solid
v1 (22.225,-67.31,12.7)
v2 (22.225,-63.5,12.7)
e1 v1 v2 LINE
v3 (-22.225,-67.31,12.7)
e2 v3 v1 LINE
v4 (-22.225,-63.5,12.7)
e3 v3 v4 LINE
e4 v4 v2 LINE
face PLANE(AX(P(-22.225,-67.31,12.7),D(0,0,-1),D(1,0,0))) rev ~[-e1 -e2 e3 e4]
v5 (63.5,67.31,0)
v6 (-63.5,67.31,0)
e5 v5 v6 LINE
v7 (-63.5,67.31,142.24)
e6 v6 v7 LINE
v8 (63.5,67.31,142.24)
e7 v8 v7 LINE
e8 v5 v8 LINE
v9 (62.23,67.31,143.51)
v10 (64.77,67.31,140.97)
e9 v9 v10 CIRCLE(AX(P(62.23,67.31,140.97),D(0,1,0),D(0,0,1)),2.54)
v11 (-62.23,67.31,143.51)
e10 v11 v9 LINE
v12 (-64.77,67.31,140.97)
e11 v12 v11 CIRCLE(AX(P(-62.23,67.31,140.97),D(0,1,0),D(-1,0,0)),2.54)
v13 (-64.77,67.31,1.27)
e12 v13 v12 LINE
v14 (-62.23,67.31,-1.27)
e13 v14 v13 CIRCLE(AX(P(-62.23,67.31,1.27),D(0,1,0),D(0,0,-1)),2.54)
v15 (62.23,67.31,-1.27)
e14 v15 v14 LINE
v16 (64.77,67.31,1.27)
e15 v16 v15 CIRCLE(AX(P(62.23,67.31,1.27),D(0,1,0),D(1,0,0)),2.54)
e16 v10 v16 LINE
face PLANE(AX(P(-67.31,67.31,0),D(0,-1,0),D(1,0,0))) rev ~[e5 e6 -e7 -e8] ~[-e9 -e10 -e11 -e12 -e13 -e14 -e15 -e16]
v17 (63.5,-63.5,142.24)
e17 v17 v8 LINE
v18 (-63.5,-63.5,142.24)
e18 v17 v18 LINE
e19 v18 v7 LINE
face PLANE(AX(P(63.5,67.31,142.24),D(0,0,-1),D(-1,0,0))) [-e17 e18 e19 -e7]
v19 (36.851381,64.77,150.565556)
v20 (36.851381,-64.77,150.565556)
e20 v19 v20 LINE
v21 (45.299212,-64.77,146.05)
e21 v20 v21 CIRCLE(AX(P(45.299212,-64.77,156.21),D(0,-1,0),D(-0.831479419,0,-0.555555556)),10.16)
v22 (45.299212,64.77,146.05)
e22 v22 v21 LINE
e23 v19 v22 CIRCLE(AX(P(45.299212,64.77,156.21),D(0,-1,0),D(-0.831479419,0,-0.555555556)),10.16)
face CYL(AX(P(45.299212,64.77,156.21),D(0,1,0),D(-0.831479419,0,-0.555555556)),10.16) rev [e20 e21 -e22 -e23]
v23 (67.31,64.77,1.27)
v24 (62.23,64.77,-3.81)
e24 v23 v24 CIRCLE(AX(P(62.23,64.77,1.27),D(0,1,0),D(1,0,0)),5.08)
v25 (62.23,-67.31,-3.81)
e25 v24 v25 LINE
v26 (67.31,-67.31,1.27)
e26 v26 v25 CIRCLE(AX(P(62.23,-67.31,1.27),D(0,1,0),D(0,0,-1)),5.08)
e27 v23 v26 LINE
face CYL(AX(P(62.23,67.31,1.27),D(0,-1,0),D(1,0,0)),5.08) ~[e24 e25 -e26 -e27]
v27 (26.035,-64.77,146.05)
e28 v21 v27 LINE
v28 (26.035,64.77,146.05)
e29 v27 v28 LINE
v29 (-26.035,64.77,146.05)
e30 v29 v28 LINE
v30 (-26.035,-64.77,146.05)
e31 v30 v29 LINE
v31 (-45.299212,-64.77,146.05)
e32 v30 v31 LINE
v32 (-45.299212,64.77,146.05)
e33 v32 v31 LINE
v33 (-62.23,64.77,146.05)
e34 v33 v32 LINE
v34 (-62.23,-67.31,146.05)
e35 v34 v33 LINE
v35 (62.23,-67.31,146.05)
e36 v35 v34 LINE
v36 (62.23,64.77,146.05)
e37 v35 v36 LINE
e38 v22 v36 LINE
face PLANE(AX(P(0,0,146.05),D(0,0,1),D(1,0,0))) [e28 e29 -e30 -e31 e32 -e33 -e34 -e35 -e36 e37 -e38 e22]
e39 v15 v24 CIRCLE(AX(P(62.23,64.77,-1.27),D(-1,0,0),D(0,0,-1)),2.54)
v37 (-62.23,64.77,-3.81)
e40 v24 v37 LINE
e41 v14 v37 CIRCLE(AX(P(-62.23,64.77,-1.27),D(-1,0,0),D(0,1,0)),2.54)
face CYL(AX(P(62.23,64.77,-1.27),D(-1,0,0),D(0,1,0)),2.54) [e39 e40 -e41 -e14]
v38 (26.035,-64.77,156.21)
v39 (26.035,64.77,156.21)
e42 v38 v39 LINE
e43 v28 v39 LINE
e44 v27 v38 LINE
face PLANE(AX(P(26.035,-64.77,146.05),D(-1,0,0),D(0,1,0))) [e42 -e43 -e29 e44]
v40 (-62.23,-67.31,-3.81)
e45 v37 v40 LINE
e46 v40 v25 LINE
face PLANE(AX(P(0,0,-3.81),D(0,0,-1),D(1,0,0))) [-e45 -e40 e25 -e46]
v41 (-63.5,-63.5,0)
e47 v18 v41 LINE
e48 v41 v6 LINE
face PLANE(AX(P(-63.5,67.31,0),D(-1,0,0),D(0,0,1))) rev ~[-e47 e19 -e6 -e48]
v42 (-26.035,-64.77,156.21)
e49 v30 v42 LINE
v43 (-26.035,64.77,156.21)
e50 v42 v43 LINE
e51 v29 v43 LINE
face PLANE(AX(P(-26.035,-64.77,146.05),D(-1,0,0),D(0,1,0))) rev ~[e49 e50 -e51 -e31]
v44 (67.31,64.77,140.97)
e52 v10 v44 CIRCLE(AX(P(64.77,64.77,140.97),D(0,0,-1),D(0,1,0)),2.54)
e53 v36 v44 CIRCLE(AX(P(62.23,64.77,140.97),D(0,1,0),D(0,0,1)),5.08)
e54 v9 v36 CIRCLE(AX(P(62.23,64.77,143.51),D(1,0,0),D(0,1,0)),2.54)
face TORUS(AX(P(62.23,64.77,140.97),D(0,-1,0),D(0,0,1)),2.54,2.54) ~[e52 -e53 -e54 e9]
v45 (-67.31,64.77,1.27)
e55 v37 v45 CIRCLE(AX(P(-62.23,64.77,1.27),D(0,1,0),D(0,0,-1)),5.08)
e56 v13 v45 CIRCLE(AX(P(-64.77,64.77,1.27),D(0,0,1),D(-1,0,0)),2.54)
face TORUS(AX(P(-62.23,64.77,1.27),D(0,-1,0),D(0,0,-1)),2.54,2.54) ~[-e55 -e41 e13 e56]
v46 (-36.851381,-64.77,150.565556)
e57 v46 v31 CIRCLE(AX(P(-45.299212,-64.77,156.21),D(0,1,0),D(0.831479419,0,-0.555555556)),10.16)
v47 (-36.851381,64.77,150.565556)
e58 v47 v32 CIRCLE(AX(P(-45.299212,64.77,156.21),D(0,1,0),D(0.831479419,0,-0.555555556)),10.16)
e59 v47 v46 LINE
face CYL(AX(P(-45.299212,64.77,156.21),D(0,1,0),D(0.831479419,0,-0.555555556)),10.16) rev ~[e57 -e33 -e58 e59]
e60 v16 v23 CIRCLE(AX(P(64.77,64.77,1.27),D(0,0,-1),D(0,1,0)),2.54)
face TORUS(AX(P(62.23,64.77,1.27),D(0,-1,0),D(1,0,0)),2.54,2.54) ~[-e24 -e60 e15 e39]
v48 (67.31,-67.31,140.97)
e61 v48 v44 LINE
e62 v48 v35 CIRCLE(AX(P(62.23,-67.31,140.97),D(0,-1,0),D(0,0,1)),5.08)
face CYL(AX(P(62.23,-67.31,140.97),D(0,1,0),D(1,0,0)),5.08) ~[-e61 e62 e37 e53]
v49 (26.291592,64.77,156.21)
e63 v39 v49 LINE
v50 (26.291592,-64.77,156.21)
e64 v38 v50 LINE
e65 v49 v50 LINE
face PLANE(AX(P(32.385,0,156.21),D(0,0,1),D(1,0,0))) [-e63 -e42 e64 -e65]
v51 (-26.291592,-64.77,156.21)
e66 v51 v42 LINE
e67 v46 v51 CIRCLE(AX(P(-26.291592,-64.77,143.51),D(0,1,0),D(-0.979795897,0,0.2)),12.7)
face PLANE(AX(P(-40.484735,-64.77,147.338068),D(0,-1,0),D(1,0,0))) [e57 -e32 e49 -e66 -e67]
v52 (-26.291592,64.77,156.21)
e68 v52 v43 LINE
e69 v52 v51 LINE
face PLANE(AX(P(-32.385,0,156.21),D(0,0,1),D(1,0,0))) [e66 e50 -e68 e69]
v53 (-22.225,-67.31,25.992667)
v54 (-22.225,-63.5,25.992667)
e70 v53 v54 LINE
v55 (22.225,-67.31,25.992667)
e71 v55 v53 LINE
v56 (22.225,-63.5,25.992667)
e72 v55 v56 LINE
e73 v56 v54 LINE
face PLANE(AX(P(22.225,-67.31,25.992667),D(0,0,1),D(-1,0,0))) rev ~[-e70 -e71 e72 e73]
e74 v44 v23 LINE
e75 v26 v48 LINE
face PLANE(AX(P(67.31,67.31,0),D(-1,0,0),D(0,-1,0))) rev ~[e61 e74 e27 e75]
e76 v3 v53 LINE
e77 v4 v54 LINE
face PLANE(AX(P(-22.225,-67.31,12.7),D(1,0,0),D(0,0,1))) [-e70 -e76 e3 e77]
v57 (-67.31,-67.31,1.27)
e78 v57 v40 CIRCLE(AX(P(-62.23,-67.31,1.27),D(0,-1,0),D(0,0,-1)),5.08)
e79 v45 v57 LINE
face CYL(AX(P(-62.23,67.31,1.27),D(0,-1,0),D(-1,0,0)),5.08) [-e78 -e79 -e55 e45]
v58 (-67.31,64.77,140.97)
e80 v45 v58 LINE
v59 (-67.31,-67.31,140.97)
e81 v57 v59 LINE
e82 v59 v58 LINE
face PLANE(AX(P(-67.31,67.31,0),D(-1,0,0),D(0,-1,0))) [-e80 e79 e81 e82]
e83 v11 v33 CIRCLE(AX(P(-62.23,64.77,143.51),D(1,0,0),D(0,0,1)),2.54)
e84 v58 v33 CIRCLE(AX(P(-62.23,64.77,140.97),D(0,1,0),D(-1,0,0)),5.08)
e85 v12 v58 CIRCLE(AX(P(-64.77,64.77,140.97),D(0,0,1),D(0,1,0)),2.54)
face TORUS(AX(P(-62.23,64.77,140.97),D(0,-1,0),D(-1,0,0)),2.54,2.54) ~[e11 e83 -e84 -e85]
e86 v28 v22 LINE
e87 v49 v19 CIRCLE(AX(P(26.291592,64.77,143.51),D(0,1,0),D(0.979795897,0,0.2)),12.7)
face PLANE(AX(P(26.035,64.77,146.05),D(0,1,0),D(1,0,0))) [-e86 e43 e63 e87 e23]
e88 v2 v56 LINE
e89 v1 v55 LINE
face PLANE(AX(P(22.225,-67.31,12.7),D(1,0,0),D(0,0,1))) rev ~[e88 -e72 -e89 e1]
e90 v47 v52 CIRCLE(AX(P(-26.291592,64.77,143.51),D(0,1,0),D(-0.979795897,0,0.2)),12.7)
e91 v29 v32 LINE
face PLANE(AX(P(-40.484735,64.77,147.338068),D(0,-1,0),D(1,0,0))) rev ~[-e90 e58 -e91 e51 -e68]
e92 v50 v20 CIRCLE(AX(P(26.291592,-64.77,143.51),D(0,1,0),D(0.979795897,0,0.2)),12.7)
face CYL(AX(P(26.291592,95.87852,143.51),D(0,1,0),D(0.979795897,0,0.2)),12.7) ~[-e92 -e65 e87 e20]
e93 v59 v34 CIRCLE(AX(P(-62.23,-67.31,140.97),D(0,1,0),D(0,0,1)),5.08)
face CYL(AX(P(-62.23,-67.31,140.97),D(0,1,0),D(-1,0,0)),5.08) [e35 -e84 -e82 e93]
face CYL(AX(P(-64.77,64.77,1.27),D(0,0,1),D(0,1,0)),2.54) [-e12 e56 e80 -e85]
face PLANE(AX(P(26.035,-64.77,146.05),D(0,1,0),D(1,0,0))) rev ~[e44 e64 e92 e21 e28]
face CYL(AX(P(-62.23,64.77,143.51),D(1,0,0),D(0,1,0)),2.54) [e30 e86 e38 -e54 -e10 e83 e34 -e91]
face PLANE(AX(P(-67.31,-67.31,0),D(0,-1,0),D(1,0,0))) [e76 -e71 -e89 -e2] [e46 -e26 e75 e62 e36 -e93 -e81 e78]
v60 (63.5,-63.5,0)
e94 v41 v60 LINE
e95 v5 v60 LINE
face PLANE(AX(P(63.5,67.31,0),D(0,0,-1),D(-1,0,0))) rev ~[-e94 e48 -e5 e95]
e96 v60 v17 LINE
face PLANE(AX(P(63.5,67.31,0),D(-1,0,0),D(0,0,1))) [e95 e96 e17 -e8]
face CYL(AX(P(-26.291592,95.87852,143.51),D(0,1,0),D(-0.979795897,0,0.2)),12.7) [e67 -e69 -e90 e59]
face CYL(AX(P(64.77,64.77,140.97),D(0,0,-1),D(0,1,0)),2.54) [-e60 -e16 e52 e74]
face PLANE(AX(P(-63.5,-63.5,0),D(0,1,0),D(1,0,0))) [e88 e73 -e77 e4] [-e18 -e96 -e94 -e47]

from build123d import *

# Parameters (mm, degrees)
F0_W         = 134.62
F0_H         = 134.62
F0_W_2       = 127
F0_H_2       = 127
F1_DEPTH     = 140.97
F2_W         = 134.62
F2_H         = 134.62
F3_DEPTH     = 5.08
F4_W         = 22.225
F4_H         = 13.2926666667
F5_DEPTH     = 3.81
F6_W         = 134.62
F6_H         = 134.62
F7_DEPTH     = 3.81
F8_W         = 127
F8_H         = 142.24
F9_DEPTH     = 3.81
F10_W        = 127
F10_H        = 1.27
F11_DEPTH    = 127
F12_R        = 5.08
F13_R        = 2.54
F14_W        = 12.7
F14_H        = 129.54
F15_DEPTH    = 10.16
F16_T1_DEPTH = 191.7570394667
F17_T1_DEPTH = 129.54


# Not quite as in the source:
# - a fillet or chamfer that OpenCascade refuses, or shapes differently, is made with other operations: its cross-section is extruded or revolved along the edge and cut away or added


with BuildPart() as f1:
    # F0 (on Top) → F1 (new body)
    with BuildSketch(Plane.XY):
        Rectangle(F0_W, F0_H)
        Rectangle(F0_W_2, F0_H_2, mode=Mode.SUBTRACT)
    extrude(amount=F1_DEPTH)

    # F2 (on face) → F3 (join)
    with BuildSketch(Plane.XY.offset(140.97)):
        Rectangle(F2_W, F2_H)
    extrude(amount=F3_DEPTH)

    # F4 (on face) → F5 (cut, through all)
    with BuildSketch(Plane.XZ.offset(67.31)):
        with Locations((11.1125, 19.3463333333)):
            Rectangle(F4_W, F4_H)
        with Locations((-11.1125, 19.3463333333)):
            Rectangle(F4_W, F4_H)
    extrude(amount=-F5_DEPTH, mode=Mode.SUBTRACT)

    # F6 (on face) → F7 (join)
    with BuildSketch(Plane(origin=(0, 0, 0), x_dir=(1, 0, 0), z_dir=(0, 0, -1))):
        Rectangle(F6_W, F6_H)
    extrude(amount=F7_DEPTH)

    # F8 (on face) → F9 (cut)
    with BuildSketch(Plane(origin=(0, 67.31, 0), x_dir=(-1, 0, 0), z_dir=(0, 1, 0))):
        with Locations((0, 71.12)):
            Rectangle(F8_W, F8_H)
    extrude(amount=-F9_DEPTH, mode=Mode.SUBTRACT)

    # F10 (on face) → F11 (cut, through all)
    with BuildSketch(Plane(origin=(0, 63.5, 0), x_dir=(-1, 0, 0), z_dir=(0, 1, 0))):
        with Locations((0, 141.605)):
            Rectangle(F10_W, F10_H)
    extrude(amount=-F11_DEPTH, mode=Mode.SUBTRACT)

    # F12
    f12_edges = [f1.edges().sort_by_distance(p)[0] for p in [
        (-67.31, 0, -3.81),
        (67.31, 0, -3.81),
        (67.31, 0, 146.05),
        (-67.31, 0, 146.05),
    ]]
    fillet(f12_edges, radius=F12_R)

    # F13
    f13_edges = [f1.edges().sort_by_distance(p)[0] for p in [
        (67.31, 67.31, 71.12),
        (0, 67.31, -3.81),
        (0, 67.31, 146.05),
        (-67.31, 67.31, 71.12),
        (65.822102, 67.31, 144.562102),
        (65.822102, 67.31, -2.322102),
        (-65.822102, 67.31, 144.562102),
        (-65.822102, 67.31, -2.322102),
    ]]
    fillet(f13_edges, radius=F13_R)

    # F14 (on face) → F15 (join)
    with BuildSketch(Plane.XY.offset(146.05)):
        with Locations((-32.385, 0)):
            Rectangle(F14_W, F14_H)
        with Locations((32.385, 0)):
            Rectangle(F14_W, F14_H)
    extrude(amount=F15_DEPTH)

    # F16: fillet of radius 12.7 on 2 edges, made by hand

    # F16_s2 → F16_t1 (cut)
    with BuildSketch(Plane.XZ.offset(-95.8785197333)):
        with BuildLine():
            ThreePointArc((-38.735, 146.05), (-34.3237773635, 153.3473776994), (-26.2915921067, 156.21))
            Line((-26.2915921067, 156.21), (-38.735, 156.21))
            Line((-38.735, 156.21), (-38.735, 146.05))
        make_face()
        with BuildLine():
            ThreePointArc((38.735, 146.05), (34.3237773635, 153.3473776994), (26.2915921067, 156.21))
            Line((26.2915921067, 156.21), (38.735, 156.21))
            Line((38.735, 156.21), (38.735, 146.05))
        make_face()
    extrude(amount=F16_T1_DEPTH, mode=Mode.SUBTRACT)

    # F17: fillet of radius 10.16 on 2 edges, made by hand

    # F17_s2 → F17_t1 (join)
    with BuildSketch(Plane.XZ.offset(-64.77)):
        with BuildLine():
            ThreePointArc((-36.8513807316, 150.5655555556), (-40.5097417003, 147.2497222265), (-45.2992116315, 146.05))
            Line((-45.2992116315, 146.05), (-38.735, 146.05))
            ThreePointArc((-38.735, 146.05), (-38.0126979849, 148.3993432066), (-36.8513807316, 150.5655555556))
        make_face()
        with BuildLine():
            ThreePointArc((36.8513807316, 150.5655555556), (40.5097417003, 147.2497222265), (45.2992116315, 146.05))
            Line((45.2992116315, 146.05), (38.735, 146.05))
            ThreePointArc((38.735, 146.05), (38.0126979849, 148.3993432066), (36.8513807316, 150.5655555556))
        make_face()
    extrude(amount=F17_T1_DEPTH)


solid = f1.part
